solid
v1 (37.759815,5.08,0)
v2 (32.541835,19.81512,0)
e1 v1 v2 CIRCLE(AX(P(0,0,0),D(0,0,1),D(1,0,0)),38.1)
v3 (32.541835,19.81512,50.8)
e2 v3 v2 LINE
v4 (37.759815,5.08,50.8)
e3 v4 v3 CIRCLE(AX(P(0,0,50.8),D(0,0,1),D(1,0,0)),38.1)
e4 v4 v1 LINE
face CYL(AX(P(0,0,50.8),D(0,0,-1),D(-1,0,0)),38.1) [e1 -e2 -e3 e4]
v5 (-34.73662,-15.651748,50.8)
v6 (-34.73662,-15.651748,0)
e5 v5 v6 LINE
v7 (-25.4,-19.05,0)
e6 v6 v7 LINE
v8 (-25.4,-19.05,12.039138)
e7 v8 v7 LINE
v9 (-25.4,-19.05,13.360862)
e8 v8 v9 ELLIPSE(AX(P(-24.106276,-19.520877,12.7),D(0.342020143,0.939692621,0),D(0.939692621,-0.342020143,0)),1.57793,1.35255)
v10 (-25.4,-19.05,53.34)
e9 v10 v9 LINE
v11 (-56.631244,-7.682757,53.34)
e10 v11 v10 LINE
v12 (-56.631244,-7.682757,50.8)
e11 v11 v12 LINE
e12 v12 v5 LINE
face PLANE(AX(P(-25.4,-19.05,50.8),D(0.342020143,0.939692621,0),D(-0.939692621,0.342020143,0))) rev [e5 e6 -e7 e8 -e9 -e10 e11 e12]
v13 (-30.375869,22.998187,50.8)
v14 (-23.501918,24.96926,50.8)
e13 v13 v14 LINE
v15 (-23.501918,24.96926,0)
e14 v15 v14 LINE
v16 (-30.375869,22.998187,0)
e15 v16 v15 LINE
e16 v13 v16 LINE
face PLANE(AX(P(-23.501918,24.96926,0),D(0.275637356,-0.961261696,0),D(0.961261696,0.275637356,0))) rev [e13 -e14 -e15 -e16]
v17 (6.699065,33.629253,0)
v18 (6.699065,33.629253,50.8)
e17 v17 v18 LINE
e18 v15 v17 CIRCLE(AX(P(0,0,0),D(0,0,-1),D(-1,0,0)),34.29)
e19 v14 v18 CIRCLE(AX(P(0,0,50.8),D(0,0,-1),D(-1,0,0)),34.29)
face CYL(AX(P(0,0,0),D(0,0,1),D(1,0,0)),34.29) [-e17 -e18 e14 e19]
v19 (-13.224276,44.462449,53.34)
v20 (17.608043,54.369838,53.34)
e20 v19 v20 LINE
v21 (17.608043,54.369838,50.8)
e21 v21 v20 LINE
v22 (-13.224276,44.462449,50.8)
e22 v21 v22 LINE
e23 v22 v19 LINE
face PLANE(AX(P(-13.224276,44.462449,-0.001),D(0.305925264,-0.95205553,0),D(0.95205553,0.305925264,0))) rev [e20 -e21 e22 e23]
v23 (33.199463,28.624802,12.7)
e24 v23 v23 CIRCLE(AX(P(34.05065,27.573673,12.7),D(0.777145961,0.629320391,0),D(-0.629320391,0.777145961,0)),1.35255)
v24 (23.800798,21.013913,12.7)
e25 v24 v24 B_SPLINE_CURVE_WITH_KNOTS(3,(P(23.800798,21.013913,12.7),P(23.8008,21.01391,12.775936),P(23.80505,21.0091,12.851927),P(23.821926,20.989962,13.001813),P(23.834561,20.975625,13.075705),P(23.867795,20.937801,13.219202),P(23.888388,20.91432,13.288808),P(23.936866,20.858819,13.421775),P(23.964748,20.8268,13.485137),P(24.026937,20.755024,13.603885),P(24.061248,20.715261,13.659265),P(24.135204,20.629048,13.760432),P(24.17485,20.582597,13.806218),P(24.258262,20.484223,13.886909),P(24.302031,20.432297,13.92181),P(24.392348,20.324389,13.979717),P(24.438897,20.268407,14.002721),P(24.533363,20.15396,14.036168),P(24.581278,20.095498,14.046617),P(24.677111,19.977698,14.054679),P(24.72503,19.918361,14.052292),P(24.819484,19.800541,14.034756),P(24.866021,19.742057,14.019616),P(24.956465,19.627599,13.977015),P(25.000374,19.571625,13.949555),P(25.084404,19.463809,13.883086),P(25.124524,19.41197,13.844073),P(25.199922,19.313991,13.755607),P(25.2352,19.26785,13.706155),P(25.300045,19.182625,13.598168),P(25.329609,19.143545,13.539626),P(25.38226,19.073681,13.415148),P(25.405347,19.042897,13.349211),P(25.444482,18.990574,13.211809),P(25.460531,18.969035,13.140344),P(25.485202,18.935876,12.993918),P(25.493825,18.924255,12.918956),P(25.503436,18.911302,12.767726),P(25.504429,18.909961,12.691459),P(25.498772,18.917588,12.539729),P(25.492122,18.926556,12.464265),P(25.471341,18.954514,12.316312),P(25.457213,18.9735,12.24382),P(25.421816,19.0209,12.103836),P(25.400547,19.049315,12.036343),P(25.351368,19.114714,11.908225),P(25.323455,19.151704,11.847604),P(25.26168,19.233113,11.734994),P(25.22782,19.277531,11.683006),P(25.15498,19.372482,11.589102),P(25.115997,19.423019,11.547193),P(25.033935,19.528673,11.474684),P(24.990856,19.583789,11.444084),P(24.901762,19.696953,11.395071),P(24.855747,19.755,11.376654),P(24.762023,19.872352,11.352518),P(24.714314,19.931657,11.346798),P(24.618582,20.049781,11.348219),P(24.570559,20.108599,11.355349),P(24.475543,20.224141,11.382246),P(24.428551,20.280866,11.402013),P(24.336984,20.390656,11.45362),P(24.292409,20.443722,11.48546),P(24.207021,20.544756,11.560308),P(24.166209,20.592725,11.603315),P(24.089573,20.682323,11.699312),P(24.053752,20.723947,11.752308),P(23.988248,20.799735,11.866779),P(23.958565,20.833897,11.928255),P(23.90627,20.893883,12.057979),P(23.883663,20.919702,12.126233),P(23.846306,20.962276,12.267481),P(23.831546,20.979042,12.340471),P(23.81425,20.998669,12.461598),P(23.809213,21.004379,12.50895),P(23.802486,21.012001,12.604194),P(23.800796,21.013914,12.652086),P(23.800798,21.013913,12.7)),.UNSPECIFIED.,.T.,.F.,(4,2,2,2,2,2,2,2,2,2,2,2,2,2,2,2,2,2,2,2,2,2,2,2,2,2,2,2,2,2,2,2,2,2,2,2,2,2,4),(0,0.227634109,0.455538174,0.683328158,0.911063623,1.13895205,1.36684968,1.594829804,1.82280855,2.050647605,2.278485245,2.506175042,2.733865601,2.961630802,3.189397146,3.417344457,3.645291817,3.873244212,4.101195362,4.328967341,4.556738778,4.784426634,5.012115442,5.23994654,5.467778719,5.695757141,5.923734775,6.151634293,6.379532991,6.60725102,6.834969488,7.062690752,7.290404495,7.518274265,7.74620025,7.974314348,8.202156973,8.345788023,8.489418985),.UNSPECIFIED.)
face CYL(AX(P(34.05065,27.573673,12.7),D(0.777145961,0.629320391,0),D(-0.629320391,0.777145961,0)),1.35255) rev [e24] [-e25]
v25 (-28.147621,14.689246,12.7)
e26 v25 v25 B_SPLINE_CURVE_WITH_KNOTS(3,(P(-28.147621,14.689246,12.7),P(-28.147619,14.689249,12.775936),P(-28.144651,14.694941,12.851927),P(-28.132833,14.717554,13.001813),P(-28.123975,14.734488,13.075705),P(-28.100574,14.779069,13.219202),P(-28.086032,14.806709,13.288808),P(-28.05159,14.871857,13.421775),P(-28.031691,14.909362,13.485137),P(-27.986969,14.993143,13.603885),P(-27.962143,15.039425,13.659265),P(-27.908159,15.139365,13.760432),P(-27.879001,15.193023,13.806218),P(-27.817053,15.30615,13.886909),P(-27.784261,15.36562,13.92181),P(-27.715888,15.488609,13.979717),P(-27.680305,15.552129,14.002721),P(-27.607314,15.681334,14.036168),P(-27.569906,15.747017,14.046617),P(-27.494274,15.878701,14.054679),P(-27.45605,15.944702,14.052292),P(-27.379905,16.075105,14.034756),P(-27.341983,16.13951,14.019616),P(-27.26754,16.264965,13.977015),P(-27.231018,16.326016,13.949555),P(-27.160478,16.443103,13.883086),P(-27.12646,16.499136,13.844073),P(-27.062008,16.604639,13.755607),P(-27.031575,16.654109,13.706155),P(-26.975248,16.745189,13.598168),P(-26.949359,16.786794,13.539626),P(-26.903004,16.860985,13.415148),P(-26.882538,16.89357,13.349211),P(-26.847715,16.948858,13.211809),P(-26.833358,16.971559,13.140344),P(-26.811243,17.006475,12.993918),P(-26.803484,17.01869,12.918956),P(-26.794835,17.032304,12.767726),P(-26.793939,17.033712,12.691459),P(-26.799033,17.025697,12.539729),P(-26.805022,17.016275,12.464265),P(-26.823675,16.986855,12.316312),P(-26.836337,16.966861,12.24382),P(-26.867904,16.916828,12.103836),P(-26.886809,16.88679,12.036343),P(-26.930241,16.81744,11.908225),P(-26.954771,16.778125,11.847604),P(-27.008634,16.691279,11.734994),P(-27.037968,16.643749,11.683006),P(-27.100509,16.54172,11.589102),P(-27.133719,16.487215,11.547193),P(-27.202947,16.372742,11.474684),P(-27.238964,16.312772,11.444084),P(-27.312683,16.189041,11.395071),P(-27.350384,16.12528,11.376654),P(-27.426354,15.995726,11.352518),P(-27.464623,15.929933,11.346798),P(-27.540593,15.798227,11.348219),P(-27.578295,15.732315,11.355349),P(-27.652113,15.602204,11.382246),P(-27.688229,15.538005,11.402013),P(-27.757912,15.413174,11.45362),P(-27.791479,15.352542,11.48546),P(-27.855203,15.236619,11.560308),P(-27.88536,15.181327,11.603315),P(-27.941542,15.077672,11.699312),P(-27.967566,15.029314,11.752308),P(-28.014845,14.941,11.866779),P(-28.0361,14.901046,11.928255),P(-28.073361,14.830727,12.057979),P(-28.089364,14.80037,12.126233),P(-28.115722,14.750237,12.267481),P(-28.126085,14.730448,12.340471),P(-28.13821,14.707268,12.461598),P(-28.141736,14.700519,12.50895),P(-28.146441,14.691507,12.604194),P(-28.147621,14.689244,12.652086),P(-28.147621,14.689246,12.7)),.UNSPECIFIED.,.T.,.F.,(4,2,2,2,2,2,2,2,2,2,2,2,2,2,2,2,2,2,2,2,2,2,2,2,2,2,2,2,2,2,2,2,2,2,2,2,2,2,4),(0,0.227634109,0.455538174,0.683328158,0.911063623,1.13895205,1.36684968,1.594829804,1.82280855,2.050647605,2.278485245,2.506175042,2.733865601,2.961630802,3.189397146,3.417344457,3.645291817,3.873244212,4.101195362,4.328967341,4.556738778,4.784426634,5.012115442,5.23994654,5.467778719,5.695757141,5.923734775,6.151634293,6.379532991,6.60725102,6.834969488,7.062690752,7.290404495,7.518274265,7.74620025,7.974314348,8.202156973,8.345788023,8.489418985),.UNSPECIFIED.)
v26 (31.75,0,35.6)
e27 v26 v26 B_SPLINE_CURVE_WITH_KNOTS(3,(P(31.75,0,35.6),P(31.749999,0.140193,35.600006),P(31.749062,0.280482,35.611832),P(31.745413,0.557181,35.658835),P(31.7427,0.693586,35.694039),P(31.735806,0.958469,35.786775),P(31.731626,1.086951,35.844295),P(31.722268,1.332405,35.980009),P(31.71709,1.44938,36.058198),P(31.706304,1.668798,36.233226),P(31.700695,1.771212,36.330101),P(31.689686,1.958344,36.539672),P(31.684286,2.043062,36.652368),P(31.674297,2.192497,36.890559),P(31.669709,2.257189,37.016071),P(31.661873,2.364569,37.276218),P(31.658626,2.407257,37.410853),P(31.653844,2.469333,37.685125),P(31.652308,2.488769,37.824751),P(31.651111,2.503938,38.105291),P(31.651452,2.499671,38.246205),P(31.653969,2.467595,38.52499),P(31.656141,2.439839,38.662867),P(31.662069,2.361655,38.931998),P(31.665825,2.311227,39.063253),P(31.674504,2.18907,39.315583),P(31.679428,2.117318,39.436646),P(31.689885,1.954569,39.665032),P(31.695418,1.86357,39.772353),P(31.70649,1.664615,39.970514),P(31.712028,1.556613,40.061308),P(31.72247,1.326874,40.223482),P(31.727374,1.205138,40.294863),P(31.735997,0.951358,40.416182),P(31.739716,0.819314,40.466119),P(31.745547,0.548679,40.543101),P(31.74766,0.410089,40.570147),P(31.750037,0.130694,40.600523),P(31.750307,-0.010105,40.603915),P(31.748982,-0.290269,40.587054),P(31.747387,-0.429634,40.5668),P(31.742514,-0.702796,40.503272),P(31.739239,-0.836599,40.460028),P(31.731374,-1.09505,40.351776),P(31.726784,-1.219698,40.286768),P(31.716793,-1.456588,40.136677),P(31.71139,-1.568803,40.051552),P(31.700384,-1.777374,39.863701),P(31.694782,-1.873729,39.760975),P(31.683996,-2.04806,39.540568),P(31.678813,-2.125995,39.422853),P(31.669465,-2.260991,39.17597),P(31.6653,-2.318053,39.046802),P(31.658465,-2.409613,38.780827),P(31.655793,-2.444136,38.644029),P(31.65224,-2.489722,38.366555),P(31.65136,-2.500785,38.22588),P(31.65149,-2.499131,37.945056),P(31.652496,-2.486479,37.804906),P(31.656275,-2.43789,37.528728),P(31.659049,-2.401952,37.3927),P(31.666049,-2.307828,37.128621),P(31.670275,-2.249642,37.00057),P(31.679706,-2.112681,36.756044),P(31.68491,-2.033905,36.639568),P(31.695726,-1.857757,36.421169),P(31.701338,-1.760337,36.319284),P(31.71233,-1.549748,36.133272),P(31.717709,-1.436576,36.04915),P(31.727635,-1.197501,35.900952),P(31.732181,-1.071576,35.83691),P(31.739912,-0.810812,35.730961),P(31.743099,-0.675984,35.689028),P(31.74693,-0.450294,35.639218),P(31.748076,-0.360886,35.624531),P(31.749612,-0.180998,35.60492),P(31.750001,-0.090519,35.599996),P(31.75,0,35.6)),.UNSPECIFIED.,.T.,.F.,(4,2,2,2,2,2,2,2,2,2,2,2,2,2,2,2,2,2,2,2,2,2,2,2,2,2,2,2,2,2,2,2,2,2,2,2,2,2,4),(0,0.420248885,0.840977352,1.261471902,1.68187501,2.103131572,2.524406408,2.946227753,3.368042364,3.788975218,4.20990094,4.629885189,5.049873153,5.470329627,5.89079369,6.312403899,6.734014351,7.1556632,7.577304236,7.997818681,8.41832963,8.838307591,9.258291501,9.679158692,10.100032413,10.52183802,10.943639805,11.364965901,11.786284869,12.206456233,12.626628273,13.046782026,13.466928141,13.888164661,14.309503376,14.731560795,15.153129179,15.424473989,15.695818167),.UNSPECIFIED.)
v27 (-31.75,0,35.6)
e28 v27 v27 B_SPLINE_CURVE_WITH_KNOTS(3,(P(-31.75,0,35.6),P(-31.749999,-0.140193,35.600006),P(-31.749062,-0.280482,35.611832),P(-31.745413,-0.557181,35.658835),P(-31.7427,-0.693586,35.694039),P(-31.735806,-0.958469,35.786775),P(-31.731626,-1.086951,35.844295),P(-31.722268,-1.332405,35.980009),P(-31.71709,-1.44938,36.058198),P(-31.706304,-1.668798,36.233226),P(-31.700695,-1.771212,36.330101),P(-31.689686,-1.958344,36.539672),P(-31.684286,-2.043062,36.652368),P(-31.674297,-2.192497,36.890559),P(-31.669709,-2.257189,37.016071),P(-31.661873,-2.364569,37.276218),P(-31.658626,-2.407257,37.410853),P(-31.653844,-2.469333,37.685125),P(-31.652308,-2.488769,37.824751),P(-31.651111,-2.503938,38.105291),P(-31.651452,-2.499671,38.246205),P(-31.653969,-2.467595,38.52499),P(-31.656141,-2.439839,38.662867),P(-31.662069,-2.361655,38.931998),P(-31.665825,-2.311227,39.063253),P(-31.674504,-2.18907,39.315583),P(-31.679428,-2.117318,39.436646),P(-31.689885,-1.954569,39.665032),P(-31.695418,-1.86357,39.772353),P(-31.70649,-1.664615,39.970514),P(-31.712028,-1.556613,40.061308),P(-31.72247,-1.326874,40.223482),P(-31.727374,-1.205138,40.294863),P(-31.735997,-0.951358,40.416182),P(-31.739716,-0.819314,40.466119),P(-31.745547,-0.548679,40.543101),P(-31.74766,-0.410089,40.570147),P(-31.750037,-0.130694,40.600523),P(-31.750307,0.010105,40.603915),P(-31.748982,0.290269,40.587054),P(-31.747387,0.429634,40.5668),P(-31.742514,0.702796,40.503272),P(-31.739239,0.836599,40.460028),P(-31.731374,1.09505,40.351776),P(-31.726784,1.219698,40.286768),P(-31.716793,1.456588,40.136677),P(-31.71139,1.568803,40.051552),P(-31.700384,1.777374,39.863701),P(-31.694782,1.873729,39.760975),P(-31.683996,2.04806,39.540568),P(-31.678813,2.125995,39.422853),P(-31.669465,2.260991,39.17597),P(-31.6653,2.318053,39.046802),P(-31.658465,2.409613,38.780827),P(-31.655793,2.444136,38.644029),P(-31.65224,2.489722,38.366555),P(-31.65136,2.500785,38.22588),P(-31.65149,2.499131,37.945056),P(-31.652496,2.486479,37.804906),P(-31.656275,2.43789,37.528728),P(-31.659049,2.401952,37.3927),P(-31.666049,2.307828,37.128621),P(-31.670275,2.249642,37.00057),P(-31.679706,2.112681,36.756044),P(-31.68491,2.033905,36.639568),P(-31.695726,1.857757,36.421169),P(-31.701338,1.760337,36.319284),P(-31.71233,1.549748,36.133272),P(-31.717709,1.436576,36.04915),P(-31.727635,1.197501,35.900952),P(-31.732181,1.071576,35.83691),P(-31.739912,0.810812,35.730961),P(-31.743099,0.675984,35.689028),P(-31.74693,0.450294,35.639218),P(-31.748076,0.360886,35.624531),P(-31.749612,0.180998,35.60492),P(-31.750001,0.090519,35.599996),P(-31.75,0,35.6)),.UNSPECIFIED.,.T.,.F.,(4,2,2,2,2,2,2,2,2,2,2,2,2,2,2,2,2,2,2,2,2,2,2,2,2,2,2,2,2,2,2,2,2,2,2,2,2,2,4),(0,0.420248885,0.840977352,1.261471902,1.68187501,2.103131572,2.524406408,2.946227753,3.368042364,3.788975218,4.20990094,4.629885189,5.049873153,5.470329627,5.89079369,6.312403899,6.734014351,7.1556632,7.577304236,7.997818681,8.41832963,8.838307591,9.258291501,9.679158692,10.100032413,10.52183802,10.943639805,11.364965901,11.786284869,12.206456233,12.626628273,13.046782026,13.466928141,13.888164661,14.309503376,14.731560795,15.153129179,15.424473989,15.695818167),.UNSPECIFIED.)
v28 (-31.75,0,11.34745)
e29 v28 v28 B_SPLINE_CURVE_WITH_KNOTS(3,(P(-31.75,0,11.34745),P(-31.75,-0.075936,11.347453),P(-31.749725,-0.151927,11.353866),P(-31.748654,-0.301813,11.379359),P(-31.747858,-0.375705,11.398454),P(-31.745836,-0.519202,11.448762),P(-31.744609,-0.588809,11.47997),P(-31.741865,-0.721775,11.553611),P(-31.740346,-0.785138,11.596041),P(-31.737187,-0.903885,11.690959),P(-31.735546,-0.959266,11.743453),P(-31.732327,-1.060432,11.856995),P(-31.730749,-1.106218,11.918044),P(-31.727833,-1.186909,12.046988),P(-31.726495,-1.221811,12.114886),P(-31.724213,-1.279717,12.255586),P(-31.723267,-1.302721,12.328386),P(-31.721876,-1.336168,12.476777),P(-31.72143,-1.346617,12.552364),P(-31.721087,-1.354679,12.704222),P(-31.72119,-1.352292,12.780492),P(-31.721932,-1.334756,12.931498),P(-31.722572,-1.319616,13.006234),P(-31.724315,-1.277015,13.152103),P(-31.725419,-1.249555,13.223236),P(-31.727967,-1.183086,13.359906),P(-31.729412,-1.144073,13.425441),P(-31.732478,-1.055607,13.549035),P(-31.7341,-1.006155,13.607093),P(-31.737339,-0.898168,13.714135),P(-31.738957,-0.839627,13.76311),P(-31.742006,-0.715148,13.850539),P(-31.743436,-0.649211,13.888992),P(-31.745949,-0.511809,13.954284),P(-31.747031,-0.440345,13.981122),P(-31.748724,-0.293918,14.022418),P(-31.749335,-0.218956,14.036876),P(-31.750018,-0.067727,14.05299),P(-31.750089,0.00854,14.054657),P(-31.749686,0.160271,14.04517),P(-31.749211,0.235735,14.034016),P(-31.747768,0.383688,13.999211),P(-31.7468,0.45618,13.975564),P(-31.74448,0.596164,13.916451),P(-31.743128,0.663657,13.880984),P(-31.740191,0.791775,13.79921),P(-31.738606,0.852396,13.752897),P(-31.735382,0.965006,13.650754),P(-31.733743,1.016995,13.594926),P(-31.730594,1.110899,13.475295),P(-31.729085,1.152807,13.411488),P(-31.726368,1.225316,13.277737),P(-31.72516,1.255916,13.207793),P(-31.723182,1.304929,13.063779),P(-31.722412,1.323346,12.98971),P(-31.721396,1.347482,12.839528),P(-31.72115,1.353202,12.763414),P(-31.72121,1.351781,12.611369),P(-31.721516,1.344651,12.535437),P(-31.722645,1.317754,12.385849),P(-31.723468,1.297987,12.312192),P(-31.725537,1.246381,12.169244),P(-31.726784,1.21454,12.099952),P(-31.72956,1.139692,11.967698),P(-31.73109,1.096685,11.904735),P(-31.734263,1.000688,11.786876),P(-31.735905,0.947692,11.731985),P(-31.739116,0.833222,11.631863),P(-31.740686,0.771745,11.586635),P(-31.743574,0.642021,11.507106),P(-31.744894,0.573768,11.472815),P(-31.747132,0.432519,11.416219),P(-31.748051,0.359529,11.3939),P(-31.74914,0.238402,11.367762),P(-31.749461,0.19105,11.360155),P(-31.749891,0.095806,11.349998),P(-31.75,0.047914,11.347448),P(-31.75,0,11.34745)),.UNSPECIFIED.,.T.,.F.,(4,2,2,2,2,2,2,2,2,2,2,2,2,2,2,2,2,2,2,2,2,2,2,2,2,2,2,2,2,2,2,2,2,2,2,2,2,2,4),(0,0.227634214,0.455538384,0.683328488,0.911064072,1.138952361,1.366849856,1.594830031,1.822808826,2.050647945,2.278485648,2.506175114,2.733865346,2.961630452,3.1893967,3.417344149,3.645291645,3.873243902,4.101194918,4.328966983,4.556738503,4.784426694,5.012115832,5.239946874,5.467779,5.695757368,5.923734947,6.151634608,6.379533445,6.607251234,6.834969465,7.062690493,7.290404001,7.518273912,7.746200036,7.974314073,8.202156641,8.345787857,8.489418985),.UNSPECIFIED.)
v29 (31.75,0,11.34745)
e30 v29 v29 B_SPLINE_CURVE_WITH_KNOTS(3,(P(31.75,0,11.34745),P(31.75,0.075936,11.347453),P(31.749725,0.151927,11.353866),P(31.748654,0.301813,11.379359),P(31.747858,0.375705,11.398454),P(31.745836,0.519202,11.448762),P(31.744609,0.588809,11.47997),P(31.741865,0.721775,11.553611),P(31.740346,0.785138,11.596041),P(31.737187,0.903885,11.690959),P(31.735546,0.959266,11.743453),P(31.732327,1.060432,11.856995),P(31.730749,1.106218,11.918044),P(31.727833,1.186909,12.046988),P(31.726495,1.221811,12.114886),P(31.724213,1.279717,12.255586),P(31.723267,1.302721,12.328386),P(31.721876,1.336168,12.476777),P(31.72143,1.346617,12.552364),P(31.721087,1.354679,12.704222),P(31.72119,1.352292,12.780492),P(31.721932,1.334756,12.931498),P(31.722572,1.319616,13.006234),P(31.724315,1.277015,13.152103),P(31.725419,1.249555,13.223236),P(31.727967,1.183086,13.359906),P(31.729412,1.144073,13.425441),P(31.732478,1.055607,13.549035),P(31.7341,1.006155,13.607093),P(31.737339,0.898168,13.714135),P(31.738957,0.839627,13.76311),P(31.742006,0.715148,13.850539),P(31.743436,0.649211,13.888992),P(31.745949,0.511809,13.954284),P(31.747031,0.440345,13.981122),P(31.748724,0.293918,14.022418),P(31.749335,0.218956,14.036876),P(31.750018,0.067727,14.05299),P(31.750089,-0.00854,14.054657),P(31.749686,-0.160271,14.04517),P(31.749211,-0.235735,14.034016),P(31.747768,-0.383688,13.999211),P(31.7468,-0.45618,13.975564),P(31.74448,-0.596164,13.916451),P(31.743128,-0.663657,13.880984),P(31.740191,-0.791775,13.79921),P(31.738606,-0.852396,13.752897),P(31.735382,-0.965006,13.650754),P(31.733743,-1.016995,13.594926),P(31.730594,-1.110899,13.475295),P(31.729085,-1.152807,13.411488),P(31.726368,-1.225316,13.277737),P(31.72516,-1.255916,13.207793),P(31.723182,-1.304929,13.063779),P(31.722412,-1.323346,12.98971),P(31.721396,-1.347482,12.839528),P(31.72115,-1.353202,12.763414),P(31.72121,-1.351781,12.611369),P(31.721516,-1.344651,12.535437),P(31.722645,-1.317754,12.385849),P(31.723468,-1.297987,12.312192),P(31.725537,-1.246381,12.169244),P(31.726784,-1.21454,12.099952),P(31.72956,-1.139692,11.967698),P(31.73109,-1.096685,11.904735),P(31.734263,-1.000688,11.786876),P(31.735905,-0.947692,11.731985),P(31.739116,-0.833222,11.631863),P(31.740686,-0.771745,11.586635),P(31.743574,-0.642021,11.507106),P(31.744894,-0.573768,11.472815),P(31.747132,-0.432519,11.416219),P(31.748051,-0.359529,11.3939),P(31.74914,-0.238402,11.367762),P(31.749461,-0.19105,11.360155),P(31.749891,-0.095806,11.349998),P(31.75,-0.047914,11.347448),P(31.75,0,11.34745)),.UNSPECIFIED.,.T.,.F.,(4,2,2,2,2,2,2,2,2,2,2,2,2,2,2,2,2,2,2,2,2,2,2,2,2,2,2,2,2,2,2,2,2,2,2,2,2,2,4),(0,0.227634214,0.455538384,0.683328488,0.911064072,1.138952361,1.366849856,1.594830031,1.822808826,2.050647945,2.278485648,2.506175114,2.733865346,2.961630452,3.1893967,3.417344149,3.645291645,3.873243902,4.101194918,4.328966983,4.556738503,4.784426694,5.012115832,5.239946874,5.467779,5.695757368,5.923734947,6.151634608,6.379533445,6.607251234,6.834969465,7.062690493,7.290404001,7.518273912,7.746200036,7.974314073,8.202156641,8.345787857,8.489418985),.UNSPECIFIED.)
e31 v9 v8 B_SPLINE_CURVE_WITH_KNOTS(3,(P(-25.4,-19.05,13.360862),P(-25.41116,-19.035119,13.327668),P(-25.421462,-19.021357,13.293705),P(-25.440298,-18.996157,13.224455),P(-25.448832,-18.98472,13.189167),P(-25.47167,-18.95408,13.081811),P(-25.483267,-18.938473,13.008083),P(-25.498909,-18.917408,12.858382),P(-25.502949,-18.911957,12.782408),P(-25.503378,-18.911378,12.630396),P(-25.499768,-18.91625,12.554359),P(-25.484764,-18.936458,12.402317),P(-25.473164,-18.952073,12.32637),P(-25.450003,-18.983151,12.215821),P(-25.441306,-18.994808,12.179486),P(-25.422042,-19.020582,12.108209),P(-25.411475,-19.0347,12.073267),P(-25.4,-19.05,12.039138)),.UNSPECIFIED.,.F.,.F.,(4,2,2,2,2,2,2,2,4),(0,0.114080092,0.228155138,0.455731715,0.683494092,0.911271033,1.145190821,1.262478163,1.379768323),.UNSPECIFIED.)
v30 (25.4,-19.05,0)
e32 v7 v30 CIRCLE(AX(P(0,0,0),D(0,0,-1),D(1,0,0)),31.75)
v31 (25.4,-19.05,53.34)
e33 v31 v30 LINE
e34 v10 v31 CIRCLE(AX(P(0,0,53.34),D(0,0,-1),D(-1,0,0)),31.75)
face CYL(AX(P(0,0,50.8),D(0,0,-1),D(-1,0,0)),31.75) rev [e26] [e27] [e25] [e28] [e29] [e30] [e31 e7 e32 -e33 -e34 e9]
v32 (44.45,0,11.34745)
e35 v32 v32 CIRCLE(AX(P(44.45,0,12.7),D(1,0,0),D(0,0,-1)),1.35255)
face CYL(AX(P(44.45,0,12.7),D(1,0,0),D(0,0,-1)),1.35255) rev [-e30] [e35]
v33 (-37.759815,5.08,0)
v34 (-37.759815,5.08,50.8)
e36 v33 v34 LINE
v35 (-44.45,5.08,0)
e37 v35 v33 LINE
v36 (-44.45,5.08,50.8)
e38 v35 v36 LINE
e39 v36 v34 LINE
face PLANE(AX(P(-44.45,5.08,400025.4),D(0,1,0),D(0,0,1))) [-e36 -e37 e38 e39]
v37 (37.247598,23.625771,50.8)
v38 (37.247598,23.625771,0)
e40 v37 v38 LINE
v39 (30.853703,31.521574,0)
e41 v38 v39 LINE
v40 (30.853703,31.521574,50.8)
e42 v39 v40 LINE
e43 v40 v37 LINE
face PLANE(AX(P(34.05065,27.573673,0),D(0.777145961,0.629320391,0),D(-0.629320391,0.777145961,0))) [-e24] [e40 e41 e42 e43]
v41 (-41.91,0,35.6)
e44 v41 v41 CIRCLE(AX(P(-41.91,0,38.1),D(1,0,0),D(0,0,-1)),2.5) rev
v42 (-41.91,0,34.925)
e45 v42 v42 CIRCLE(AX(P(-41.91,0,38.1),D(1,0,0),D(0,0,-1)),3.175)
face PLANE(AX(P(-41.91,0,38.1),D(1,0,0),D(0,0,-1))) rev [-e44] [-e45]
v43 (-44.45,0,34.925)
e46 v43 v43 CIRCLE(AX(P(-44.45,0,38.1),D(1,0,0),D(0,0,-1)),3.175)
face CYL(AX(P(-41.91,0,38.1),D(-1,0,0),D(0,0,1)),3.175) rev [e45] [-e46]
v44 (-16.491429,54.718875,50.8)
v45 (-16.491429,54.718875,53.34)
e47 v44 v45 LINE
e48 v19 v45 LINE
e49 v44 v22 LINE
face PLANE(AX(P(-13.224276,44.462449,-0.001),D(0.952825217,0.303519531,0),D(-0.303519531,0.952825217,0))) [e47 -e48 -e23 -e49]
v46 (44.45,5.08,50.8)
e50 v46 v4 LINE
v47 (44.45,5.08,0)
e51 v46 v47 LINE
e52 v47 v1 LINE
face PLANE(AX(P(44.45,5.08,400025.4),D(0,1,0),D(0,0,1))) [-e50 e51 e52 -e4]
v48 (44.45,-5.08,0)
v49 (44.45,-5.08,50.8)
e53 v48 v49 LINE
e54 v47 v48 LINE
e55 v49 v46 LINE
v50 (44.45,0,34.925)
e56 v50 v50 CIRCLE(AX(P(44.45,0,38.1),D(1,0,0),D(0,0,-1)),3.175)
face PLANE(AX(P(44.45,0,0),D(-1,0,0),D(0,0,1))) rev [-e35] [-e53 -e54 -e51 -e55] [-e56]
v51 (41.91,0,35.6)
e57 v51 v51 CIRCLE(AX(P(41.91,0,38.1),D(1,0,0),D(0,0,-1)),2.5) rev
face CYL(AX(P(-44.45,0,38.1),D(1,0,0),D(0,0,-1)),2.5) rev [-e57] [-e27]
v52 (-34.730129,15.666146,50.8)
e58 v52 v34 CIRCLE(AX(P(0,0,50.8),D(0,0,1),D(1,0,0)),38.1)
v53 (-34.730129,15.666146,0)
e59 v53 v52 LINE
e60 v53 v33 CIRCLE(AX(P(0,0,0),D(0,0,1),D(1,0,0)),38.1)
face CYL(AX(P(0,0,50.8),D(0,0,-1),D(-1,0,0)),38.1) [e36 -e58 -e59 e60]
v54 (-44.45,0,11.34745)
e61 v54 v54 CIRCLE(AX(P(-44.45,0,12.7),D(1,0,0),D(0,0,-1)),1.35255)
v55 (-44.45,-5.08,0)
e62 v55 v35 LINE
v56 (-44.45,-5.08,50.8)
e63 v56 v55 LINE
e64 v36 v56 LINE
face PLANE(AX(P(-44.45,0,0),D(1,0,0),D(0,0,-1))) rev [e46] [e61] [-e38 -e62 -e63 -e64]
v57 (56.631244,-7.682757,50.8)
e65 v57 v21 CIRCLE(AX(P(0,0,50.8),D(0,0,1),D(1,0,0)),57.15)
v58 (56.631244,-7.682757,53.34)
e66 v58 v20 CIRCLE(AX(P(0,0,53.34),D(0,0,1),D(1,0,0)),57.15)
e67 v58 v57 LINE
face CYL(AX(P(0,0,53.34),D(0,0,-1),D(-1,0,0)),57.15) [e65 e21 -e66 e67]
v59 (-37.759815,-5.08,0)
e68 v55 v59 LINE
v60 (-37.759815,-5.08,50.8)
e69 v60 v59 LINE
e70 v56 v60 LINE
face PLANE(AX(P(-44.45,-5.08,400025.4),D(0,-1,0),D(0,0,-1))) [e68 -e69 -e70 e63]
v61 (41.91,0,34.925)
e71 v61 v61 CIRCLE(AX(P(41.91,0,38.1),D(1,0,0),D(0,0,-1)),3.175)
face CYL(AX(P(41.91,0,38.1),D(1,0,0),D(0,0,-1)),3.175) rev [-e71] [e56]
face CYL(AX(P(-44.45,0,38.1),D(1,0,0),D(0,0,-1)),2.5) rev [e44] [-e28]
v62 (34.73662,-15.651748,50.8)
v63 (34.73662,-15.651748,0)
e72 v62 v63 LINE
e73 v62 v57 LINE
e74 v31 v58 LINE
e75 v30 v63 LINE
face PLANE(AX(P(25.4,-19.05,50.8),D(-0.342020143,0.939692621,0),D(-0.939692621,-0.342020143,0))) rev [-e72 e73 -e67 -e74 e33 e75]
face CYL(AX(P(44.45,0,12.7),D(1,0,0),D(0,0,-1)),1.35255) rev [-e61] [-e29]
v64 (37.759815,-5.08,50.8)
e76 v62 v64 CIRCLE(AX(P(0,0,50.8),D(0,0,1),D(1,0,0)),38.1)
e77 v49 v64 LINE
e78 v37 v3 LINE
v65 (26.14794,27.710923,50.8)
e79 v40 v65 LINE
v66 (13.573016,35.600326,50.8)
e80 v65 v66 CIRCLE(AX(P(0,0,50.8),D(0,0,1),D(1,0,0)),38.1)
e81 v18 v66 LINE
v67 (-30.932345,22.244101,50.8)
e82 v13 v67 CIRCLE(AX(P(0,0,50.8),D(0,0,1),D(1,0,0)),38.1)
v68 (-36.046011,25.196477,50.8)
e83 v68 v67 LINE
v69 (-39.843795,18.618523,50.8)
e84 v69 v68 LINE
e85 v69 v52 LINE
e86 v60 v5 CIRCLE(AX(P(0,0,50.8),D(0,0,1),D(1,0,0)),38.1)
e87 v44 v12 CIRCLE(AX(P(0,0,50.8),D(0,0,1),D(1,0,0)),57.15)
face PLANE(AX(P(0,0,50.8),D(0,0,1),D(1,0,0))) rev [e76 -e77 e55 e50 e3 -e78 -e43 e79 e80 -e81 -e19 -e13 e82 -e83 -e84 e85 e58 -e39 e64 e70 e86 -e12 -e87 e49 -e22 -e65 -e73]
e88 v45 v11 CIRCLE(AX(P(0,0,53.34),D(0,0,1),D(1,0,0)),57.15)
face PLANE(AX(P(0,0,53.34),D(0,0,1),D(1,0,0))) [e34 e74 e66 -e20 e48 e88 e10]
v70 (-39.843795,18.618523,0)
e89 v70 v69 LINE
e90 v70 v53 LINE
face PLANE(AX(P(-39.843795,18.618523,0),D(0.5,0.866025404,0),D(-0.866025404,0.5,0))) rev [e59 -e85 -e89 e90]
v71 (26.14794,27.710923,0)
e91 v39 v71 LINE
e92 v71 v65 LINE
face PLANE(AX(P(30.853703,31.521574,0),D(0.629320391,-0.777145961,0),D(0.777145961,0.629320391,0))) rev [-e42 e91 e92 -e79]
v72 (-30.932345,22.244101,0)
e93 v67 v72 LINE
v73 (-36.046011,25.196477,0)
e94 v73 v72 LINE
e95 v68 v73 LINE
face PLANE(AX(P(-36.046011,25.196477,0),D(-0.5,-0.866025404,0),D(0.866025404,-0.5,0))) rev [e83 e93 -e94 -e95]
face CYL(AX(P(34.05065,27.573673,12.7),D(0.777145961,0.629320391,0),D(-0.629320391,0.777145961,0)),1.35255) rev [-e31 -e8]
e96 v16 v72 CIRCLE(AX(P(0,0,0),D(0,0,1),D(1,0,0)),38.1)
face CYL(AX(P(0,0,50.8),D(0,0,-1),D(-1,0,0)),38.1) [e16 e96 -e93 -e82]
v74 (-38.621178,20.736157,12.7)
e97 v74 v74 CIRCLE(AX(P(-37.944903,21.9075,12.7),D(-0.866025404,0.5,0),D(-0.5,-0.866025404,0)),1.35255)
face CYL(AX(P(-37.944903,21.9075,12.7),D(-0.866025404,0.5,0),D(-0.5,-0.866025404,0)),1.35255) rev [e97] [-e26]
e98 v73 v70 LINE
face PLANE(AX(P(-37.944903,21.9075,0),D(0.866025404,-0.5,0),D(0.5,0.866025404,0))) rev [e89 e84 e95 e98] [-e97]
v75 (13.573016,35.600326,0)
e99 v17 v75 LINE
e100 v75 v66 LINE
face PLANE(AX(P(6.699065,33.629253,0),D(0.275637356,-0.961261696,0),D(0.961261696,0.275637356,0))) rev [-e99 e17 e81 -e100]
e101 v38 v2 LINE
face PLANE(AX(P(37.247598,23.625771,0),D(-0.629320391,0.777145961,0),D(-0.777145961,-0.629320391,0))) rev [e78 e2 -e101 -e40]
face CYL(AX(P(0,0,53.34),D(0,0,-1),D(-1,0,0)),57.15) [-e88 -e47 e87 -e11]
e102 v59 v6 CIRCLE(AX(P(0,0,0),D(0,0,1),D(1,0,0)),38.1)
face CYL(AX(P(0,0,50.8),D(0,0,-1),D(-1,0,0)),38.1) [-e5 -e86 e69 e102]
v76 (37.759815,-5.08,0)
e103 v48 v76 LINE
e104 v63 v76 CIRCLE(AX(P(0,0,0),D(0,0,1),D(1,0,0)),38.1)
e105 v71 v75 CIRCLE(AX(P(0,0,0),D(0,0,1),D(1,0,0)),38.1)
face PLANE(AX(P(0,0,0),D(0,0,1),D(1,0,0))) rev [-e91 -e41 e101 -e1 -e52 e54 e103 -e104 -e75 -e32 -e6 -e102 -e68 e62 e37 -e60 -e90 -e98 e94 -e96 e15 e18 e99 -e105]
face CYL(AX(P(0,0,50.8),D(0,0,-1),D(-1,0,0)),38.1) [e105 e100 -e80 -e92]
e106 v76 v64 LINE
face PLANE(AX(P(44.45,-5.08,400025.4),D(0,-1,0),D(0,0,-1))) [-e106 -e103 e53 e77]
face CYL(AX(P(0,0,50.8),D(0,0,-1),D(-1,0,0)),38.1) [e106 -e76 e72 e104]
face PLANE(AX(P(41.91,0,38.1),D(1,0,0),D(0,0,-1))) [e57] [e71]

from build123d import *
from build123d.topology import SkipClean

# Parameters (mm, degrees)
BOSS_EXTRUDE1_DEPTH        = 50.8
BOSS_EXTRUDE2_START        = 34.925
SKETCH2_W                  = 50.8
SKETCH2_H                  = 10.16
BOSS_EXTRUDE2_DEPTH        = 9.525
BOSS_EXTRUDE3_START        = -34.925
SKETCH2_3_W                = 50.8
SKETCH2_3_H                = 10.16
BOSS_EXTRUDE3_DEPTH        = 9.525
F_6_32_TAPPED_HOLE1_D      = 2.7051
SKETCH7_R                  = 2.5
CUT_EXTRUDE1_DEPTH         = 110.249531019
SKETCH8_R                  = 3.175
CUT_EXTRUDE2_DEPTH         = 2.54
CUT_EXTRUDE3_START         = -86.36
SKETCH8_2_R                = 3.175
CUT_EXTRUDE3_DEPTH         = 2.54
CUT_EXTRUDE4_DEPTH         = 78.511628283
SKETCH11_W                 = 50.8
SKETCH11_H                 = 10.16
BOSS_EXTRUDE4_DEPTH        = 8.89
SKETCH12_W                 = 50.8
SKETCH12_H                 = 7.595567884
BOSS_EXTRUDE5_DEPTH        = 8.89
F_6_32_TAPPED_HOLE2_D      = 2.7051
F_6_32_TAPPED_HOLE3_REACH  = 107.105
F_6_32_TAPPED_HOLE3_BORE_R = 1.35255
BOSS_EXTRUDE6_DEPTH        = 2.54
CUT_EXTRUDE6_START         = -2.54
CUT_EXTRUDE6_DEPTH         = 2.54


# Read off the part's stored shape, not the designer's step: Cut-Extrude6
with BuildPart() as part:
    # Sketch1 → Boss-Extrude1 (new body)
    with BuildSketch(Plane.XY):
        with BuildLine():
            Line((-25.4, -19.05), (-34.736620143, -15.651748179))
            ThreePointArc((-34.736620143, -15.651748179), (0, 38.1), (34.736620143, -15.651748179))
            Line((34.736620143, -15.651748179), (25.4, -19.05))
            ThreePointArc((25.4, -19.05), (0, 31.75), (-25.4, -19.05))
        make_face()
    extrude(amount=BOSS_EXTRUDE1_DEPTH)

    # Sketch2 → Boss-Extrude2 (add)
    with BuildSketch(Plane(origin=(0, 0, 0), x_dir=(0, 0, -1), z_dir=(1, 0, 0)).offset(BOSS_EXTRUDE2_START)):
        with Locations((-25.4, 0)):
            Rectangle(SKETCH2_W, SKETCH2_H)
    extrude(amount=BOSS_EXTRUDE2_DEPTH)

    # Sketch2<3> → Boss-Extrude3 (add)
    with BuildSketch(Plane(origin=(0, 0, 0), x_dir=(0, 0, -1), z_dir=(1, 0, 0)).offset(BOSS_EXTRUDE3_START)):
        with Locations((-25.4, 0)):
            Rectangle(SKETCH2_3_W, SKETCH2_3_H)
    extrude(amount=-BOSS_EXTRUDE3_DEPTH)

    # #6-32 Tapped Hole1 (through all)
    with Locations(Plane(origin=(44.45, 0, 0), x_dir=(0, 0, -1), z_dir=(1, 0, 0))):
        with Locations((-12.7, 0)):
            Hole(F_6_32_TAPPED_HOLE1_D / 2)

    # Sketch7 → Cut-Extrude1 (cut, through all)
    with BuildSketch(Plane(origin=(44.45, 0, 0), x_dir=(0, 0, -1), z_dir=(1, 0, 0))):
        with Locations((-38.1, 0)):
            Circle(SKETCH7_R)
    extrude(amount=-CUT_EXTRUDE1_DEPTH, mode=Mode.SUBTRACT)

    # Sketch8 → Cut-Extrude2 (cut)
    with BuildSketch(Plane(origin=(44.45, 0, 0), x_dir=(0, 0, -1), z_dir=(1, 0, 0))):
        with Locations((-38.1, 0)):
            Circle(SKETCH8_R)
    extrude(amount=-CUT_EXTRUDE2_DEPTH, mode=Mode.SUBTRACT)

    # Sketch8<2> → Cut-Extrude3 (cut)
    with BuildSketch(Plane(origin=(44.45, 0, 0), x_dir=(0, 0, -1), z_dir=(1, 0, 0)).offset(CUT_EXTRUDE3_START)):
        with Locations((-38.1, 0)):
            Circle(SKETCH8_2_R)
    extrude(amount=-CUT_EXTRUDE3_DEPTH, mode=Mode.SUBTRACT)

    # Sketch9 → Cut-Extrude4 (cut, through all)
    with BuildSketch(Plane.XY.offset(50.8)):
        with BuildLine():
            Line((6.699064553, 33.629252655), (17.438088821, 36.708618311))
            ThreePointArc((17.438088821, 36.708618311), (-11.20190214, 39.065675323), (-34.240942031, 21.889894674))
            Line((-34.240942031, 21.889894674), (-23.501917764, 24.96926033))
            ThreePointArc((-23.501917764, 24.96926033), (-9.451604931, 32.961663554), (6.699064553, 33.629252655))
        make_face()
    extrude(amount=-CUT_EXTRUDE4_DEPTH, mode=Mode.SUBTRACT)

    # Sketch11 → Boss-Extrude4 (add)
    with BuildSketch(Plane(origin=(27.141822704, 21.979014657, 0), x_dir=(0, 0, -1), z_dir=(0.77714596145697, 0.6293203910498384, 0))):
        with Locations((-25.4, 0)):
            Rectangle(SKETCH11_W, SKETCH11_H)
    extrude(amount=BOSS_EXTRUDE4_DEPTH)

    # Sketch12 → Boss-Extrude5 (add)
    with BuildSketch(Plane(origin=(-30.245937227, 17.4625, 0), x_dir=(0, 0, 1), z_dir=(-0.8660254037844417, 0.4999999999999946, 0))):
        with Locations((25.4, 0)):
            Rectangle(SKETCH12_W, SKETCH12_H)
    extrude(amount=BOSS_EXTRUDE5_DEPTH)

    # #6-32 Tapped Hole2 (through all)
    with Locations(Plane(origin=(34.050650301, 27.573672934, 0), x_dir=(0, 0, -1), z_dir=(0.7771459614569701, 0.6293203910498384, 0))):
        with Locations((-12.7, 0)):
            Hole(F_6_32_TAPPED_HOLE2_D / 2)

    # #6-32 Tapped Hole3 bore → #6-32 Tapped Hole3 (cut, up to next)
    with BuildSketch(Plane(origin=(-37.944903067, 21.9075, 0), x_dir=(0, 0, 1), z_dir=(-0.8660254037844414, 0.4999999999999951, 0)), mode=Mode.PRIVATE) as f_6_32_tapped_hole3_sk1:
        with Locations((12.7, 0)):
            Circle(F_6_32_TAPPED_HOLE3_BORE_R)
    f_6_32_tapped_hole3_tool1 = extrude(f_6_32_tapped_hole3_sk1.sketch, amount=-F_6_32_TAPPED_HOLE3_REACH, mode=Mode.PRIVATE) & part.part
    add(f_6_32_tapped_hole3_tool1.solids().sort_by_distance((-37.944903, 21.9075, 12.7))[0], mode=Mode.SUBTRACT)

    # Sketch18 → Boss-Extrude6 (add)
    with SkipClean():  # the faces are left unmerged after this step: merging them gives an invalid solid
        with BuildSketch(Plane.XY.offset(50.8)):
            with BuildLine():
                Line((25.4, -19.05), (56.631243544, -7.682756971))
                ThreePointArc((56.631243544, -7.682756971), (0, 57.15), (-56.631243544, -7.682756971))
                Line((-56.631243544, -7.682756971), (-25.4, -19.05))
                ThreePointArc((-25.4, -19.05), (0, 31.75), (25.4, -19.05))
            make_face()
        extrude(amount=BOSS_EXTRUDE6_DEPTH)

    # Cut-Extrude6 outline → Cut-Extrude6 (cut)
    with SkipClean():  # the faces are left unmerged after this step: merging them gives an invalid solid
        with BuildSketch(Plane.XY.offset(53.34).offset(CUT_EXTRUDE6_START)):
            with BuildLine():
                Line((-16.491428664, 54.718874994), (-13.224275773, 44.4624488))
                Line((-13.224275773, 44.4624488), (17.608042575, 54.369838483))
                ThreePointArc((17.608042575, 54.369838483), (0.584947244, 57.147006367), (-16.491428664, 54.718874994))
            make_face()
        extrude(amount=CUT_EXTRUDE6_DEPTH, mode=Mode.SUBTRACT)


solid = part.part
